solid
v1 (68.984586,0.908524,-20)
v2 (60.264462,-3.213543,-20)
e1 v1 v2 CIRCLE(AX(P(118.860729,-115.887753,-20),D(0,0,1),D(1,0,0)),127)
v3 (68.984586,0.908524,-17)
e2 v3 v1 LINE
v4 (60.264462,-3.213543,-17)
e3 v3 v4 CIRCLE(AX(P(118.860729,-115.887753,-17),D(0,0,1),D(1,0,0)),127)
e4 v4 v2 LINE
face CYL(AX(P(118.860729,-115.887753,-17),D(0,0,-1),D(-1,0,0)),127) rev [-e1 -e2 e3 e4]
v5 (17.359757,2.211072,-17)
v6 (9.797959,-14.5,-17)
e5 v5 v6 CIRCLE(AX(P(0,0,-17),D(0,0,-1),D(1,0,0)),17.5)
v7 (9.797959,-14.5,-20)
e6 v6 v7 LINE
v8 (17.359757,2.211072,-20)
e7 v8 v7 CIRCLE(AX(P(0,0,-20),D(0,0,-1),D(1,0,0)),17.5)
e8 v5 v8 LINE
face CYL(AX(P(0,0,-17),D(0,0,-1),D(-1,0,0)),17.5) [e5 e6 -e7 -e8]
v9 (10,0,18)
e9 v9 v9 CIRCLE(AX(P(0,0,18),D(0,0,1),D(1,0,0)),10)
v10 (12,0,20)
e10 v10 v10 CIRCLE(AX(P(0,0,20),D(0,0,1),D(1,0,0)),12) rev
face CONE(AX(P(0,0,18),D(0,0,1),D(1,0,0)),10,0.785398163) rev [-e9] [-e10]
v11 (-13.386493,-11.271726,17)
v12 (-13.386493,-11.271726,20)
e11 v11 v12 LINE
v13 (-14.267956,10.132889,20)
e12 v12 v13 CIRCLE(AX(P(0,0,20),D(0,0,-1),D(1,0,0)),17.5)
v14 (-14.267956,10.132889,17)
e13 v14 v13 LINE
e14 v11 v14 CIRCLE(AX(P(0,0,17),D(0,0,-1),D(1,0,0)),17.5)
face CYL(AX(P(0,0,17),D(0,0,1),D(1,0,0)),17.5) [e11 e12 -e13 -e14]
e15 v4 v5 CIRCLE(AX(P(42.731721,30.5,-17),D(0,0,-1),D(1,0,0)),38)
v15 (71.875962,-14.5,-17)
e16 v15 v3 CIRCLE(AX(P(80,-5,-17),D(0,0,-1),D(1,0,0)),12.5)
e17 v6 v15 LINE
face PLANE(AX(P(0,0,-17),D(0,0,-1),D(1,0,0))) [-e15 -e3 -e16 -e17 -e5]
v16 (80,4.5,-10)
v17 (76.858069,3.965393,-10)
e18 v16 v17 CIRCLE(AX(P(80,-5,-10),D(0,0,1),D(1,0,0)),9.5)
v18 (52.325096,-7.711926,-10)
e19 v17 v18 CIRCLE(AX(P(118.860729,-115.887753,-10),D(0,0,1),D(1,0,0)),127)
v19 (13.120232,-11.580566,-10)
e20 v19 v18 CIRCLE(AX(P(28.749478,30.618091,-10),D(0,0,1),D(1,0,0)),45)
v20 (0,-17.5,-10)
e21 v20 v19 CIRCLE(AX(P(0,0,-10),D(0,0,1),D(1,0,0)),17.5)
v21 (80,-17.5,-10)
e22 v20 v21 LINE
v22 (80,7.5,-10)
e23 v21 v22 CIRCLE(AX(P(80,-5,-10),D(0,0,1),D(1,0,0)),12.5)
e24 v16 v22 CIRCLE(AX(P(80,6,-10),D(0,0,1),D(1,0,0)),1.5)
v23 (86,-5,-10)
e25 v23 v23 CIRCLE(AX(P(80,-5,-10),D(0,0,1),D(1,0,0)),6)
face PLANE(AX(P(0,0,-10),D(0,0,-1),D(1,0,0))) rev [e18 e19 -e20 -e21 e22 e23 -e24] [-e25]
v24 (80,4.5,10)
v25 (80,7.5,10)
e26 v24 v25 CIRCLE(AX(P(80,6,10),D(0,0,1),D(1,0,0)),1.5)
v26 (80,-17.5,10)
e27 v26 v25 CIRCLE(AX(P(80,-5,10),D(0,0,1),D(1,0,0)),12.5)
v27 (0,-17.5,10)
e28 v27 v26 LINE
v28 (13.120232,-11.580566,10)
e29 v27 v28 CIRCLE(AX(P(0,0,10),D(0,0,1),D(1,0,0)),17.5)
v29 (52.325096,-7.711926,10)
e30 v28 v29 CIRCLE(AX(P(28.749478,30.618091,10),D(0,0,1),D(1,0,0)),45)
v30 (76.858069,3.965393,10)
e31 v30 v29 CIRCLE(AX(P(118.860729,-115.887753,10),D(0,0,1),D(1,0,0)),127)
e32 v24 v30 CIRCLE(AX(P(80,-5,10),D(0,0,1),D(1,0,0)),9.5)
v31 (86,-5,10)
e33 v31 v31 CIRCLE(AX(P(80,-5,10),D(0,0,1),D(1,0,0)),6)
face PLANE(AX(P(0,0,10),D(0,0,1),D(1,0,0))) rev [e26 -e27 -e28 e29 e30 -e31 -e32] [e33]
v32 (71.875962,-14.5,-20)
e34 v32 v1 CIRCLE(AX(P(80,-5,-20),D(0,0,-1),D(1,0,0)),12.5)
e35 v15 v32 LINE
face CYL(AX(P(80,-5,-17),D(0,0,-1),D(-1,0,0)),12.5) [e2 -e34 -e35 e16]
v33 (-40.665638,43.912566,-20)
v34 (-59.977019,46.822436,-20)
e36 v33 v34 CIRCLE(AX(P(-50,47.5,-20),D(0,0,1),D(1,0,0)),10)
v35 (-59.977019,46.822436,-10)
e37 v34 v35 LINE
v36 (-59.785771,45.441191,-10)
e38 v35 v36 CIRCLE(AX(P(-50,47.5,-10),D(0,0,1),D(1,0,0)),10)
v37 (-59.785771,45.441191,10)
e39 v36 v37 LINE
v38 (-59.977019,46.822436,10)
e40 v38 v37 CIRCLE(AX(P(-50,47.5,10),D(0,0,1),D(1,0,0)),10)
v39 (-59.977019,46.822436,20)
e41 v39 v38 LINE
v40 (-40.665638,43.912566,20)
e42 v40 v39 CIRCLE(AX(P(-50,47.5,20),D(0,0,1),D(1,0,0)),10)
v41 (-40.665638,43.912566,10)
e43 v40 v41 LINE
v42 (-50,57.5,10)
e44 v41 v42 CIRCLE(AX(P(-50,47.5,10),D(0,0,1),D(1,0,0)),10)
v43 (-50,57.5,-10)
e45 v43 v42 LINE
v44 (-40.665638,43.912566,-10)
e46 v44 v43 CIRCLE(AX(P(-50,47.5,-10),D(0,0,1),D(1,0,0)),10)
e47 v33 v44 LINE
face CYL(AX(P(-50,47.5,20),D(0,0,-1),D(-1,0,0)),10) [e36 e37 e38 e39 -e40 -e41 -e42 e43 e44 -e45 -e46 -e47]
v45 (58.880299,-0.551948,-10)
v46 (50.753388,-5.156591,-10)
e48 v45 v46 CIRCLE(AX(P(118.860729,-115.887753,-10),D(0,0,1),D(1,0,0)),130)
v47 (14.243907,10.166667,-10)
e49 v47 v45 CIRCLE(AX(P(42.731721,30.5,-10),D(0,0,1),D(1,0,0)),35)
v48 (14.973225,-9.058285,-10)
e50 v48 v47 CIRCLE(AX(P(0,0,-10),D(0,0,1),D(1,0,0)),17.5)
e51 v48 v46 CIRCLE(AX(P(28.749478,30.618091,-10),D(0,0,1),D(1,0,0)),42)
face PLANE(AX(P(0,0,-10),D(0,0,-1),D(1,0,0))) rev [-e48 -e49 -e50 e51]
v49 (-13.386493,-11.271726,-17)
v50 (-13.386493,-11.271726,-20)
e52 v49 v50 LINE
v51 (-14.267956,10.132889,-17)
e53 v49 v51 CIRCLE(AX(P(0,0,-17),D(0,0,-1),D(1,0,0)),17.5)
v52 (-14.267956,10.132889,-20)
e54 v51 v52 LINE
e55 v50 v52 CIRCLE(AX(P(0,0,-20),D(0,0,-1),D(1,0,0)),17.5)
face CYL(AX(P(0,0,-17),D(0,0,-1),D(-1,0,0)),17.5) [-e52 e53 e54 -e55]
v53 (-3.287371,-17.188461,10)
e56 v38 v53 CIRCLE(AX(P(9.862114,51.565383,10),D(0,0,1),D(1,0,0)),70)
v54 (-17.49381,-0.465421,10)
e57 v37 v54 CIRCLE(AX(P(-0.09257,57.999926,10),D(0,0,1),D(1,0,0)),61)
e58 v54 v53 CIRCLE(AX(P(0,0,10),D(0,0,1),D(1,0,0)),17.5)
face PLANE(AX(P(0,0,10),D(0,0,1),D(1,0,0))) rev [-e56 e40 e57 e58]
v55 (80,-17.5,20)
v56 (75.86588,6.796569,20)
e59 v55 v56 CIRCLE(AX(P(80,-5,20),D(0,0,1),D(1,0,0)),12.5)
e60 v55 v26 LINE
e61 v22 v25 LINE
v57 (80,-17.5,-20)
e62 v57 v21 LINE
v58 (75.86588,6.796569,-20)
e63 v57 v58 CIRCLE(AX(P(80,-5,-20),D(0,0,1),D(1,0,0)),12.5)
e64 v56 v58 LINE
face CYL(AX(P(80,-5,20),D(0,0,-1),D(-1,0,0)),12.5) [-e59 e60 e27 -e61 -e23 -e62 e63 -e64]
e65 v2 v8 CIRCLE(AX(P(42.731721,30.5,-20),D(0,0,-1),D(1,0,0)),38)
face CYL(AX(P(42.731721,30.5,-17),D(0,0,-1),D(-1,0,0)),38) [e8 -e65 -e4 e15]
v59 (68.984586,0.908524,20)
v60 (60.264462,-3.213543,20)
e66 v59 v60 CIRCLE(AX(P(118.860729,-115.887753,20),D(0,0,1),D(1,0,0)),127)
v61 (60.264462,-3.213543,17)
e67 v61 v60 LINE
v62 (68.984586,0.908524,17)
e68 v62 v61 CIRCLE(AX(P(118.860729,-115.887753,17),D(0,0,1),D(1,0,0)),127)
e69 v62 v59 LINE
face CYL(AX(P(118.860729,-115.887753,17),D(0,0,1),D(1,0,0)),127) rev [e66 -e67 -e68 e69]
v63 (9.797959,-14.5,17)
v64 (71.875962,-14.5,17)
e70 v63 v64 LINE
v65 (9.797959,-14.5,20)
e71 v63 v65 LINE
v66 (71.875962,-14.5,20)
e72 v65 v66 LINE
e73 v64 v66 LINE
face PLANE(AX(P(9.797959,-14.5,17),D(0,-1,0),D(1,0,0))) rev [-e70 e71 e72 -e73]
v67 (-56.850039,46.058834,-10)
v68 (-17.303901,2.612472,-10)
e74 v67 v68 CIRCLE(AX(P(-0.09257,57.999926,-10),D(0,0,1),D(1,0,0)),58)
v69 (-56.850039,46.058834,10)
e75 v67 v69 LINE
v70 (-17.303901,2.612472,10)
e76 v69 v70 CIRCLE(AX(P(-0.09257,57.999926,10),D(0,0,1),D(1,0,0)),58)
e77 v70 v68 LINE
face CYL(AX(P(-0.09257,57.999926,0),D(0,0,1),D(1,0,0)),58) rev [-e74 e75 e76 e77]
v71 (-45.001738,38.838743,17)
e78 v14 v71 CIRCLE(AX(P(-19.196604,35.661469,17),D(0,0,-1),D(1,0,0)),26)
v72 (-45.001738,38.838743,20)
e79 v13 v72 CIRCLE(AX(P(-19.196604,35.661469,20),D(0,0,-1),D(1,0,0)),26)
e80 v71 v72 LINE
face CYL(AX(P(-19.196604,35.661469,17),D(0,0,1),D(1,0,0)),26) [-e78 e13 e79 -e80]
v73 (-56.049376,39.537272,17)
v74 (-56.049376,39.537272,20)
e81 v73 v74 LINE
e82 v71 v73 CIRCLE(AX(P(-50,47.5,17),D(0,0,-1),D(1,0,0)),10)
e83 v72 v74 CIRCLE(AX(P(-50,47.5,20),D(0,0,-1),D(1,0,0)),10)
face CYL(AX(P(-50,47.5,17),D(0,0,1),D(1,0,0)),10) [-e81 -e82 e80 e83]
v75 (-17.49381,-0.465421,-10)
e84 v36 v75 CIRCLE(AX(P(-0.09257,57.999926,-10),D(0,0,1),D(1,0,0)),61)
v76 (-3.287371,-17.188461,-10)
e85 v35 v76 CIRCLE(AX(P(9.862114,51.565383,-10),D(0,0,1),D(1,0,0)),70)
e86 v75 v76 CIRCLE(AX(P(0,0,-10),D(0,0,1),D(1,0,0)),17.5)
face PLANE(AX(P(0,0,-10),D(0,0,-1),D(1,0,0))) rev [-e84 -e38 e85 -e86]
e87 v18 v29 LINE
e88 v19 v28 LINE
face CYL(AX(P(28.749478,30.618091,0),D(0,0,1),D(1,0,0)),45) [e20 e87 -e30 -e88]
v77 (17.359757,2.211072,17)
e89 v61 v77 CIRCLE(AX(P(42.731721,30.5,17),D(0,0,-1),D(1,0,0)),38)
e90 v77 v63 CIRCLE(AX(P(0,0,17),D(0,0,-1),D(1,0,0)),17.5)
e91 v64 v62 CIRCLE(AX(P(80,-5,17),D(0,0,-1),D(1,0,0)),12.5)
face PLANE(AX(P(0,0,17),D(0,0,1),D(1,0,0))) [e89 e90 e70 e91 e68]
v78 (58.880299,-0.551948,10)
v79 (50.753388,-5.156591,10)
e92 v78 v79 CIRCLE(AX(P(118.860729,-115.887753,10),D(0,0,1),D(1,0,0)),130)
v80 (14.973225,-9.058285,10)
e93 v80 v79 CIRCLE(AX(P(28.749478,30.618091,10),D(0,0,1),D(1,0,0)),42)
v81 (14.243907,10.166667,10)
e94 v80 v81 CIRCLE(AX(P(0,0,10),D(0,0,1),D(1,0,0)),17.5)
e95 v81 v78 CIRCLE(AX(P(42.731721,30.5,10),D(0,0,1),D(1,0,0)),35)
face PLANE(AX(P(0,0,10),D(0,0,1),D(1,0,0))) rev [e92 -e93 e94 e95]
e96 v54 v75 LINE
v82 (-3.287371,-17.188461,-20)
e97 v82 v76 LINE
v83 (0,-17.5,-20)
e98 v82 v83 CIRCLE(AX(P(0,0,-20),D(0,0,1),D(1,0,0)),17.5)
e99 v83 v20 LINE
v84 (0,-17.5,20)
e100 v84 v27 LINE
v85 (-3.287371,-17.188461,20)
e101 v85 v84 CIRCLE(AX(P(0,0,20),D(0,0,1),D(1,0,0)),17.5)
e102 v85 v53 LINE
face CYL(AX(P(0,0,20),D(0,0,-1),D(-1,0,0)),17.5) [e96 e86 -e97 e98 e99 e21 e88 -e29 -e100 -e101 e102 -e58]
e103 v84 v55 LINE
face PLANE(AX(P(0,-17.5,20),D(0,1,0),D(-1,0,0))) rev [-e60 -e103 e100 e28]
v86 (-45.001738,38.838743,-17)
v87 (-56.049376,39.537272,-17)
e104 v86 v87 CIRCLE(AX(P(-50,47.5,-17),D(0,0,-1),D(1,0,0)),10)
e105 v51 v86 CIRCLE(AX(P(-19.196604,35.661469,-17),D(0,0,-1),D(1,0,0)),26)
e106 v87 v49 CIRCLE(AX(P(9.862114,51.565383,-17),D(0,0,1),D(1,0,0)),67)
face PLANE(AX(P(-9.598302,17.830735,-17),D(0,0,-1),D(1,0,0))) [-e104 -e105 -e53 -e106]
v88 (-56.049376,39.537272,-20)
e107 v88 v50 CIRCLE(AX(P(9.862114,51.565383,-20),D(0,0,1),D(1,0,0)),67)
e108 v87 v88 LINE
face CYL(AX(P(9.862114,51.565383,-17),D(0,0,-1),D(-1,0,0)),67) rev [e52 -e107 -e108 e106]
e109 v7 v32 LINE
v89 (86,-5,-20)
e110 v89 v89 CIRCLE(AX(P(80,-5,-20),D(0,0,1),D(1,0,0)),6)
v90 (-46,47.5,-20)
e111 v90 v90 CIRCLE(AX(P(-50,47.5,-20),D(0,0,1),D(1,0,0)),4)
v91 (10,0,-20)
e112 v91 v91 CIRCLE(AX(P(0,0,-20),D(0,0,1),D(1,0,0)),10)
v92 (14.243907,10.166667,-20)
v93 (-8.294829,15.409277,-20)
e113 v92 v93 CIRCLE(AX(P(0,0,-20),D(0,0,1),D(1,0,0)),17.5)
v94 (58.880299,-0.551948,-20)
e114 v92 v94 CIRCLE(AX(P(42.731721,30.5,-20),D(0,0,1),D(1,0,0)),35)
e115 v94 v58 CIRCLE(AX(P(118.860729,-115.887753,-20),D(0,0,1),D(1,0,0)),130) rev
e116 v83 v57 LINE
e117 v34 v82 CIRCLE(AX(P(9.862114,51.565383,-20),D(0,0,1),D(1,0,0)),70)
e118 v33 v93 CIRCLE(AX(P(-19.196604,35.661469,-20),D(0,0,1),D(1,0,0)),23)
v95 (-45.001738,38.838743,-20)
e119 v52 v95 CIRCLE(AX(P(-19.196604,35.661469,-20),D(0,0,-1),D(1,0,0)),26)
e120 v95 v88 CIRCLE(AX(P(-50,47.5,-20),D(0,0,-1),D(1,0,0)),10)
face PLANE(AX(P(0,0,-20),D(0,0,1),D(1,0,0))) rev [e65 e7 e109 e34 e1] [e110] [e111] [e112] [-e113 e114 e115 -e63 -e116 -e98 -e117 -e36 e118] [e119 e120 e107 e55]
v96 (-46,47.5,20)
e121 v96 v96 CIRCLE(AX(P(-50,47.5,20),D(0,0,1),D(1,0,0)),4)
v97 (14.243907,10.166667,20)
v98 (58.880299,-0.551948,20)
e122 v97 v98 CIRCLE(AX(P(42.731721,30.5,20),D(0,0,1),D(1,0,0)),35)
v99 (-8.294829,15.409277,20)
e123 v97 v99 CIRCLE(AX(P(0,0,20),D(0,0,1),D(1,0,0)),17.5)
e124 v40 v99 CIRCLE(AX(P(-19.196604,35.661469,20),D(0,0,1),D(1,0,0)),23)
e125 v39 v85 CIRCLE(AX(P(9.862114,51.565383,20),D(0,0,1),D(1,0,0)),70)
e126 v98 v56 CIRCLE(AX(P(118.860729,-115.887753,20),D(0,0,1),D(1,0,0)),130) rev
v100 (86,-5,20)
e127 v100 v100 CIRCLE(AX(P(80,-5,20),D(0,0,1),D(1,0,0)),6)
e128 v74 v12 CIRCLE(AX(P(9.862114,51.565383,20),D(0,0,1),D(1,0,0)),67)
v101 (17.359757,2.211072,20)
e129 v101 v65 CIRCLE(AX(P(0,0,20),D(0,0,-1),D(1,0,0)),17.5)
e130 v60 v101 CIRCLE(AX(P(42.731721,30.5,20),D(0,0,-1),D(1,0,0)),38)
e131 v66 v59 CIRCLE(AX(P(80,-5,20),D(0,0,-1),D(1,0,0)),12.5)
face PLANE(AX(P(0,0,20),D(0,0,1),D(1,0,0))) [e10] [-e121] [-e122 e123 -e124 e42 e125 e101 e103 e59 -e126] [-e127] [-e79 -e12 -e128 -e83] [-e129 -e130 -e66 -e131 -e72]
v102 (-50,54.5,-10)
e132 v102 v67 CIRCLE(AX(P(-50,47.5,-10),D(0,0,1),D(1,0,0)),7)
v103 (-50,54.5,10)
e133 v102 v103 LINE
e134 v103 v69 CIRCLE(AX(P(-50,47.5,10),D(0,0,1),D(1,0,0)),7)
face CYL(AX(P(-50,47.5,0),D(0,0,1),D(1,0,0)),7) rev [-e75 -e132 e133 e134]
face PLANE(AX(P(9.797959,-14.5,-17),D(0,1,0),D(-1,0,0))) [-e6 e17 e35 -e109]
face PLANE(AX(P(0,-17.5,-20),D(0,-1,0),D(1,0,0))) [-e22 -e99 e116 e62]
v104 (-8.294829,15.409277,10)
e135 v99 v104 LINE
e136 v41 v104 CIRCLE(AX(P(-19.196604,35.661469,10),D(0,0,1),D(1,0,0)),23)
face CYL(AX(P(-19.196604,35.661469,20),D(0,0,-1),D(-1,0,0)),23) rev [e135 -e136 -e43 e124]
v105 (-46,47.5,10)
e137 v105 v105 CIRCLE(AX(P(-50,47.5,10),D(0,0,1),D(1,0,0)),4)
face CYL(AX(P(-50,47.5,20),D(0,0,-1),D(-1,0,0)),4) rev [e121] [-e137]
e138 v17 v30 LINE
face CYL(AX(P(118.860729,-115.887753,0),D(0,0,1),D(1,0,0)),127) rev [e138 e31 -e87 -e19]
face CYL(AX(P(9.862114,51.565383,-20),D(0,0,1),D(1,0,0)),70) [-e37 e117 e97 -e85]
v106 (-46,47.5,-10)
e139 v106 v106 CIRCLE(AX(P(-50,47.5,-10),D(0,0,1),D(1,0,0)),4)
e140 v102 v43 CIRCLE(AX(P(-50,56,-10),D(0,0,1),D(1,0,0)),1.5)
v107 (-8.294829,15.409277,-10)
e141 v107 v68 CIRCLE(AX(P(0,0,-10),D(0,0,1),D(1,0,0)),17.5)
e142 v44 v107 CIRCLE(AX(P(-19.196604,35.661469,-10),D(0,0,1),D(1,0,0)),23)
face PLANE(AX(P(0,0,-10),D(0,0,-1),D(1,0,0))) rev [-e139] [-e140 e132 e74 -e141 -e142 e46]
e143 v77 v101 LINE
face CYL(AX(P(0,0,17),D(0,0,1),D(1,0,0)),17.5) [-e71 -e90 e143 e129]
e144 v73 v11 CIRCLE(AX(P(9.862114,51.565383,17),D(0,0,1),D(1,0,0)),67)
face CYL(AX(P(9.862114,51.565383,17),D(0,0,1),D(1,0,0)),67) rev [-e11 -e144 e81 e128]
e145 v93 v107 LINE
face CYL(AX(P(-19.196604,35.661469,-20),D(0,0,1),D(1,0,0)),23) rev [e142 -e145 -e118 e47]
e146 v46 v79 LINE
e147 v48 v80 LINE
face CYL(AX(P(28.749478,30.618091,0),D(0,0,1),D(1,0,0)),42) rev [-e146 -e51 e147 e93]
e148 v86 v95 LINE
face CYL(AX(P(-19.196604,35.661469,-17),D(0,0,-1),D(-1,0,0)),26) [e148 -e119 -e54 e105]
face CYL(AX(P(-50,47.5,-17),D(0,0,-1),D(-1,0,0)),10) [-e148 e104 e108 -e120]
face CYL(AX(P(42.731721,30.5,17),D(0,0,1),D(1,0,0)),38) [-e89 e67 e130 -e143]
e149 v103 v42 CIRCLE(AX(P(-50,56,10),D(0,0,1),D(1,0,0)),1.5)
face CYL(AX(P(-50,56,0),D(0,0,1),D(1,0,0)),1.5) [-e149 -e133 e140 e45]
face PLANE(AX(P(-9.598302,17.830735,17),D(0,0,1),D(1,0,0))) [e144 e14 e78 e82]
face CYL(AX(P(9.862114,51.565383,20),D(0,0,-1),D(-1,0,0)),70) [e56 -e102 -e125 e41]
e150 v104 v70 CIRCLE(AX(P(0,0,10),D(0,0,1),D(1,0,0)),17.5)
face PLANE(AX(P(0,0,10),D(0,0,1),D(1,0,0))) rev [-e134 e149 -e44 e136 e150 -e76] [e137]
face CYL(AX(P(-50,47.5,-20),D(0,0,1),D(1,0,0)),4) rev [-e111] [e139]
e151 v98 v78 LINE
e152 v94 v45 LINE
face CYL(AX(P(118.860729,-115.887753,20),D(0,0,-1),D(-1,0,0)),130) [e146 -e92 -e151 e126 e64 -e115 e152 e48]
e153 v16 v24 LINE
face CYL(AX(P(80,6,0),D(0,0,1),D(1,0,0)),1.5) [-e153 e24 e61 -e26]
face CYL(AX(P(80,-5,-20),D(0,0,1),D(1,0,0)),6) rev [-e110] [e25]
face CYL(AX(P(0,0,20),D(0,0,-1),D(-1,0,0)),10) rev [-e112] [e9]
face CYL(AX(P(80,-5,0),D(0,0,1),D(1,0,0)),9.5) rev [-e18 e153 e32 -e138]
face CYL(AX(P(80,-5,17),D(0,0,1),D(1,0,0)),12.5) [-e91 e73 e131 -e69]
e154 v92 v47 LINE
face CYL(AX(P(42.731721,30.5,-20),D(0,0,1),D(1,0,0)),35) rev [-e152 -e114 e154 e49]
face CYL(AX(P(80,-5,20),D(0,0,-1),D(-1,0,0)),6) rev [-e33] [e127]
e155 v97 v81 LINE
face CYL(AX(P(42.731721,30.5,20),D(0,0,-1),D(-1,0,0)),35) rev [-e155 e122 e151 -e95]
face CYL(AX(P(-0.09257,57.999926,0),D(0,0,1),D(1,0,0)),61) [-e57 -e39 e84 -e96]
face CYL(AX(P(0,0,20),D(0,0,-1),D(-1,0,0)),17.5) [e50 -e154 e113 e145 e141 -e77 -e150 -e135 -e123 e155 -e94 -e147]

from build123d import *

# Parameters (mm, degrees)
SKETCH_1_R          = 17.5
SKETCH_1_R_2        = 10
EXTRUDE_1_DEPTH     = 20
EXTRUDE_START       = 20
EXTRUDE_3_DEPTH     = 10
SKETCH_1_5_R        = 10
SKETCH_1_5_R_2      = 4
SKETCH_1_5_R_3      = 12.5
SKETCH_1_5_R_4      = 6
EXTRUDE_6_DEPTH     = 10
EXTRUDE_START_2     = -20
EXTRUDE_5_DEPTH     = 10
CUT_EXTRUDE_2_DEPTH = 3
CHAMFER_2_SIZE      = 2


# Read off the part's stored shape, not the designer's step: 凸台-拉伸5
with BuildPart() as part:
    # 草图1 → 凸台-拉伸1 (new, symmetric)
    with BuildSketch(Plane.XY):
        Circle(SKETCH_1_R)
        Circle(SKETCH_1_R_2, mode=Mode.SUBTRACT)
    extrude(amount=EXTRUDE_1_DEPTH, both=True)

    # 草图1<4> → 凸台-拉伸3 (add)
    with BuildSketch(Plane.XY.offset(EXTRUDE_START)):
        with BuildLine():
            ThreePointArc((17.5, 0), (12.374368671, -12.374368671), (0, -17.5))
            Line((0, -17.5), (80, -17.5))
            ThreePointArc((80, -17.5), (67.677112384, -7.096769134), (75.865879936, 6.796569471))
            ThreePointArc((75.865879936, 6.796569471), (67.242154598, 3.424957178), (58.880298558, -0.551947613))
            ThreePointArc((58.880298558, -0.551947613), (34.559428753, -3.532537894), (14.243907079, 10.166666667))
            ThreePointArc((14.243907079, 10.166666667), (16.666108932, 5.33767862), (17.5, 0))
        make_face()
        with BuildLine():
            ThreePointArc((-59.977018957, 46.822436185), (-42.541382371, 5.155539161), (-3.287371248, -17.188460963))
            ThreePointArc((-3.287371248, -17.188460963), (-17.297108649, -2.657072143), (-8.294829009, 15.409276807))
            ThreePointArc((-8.294829009, 15.409276807), (-34.396147549, 18.399549118), (-40.66563766, 43.912566419))
            ThreePointArc((-40.66563766, 43.912566419), (-51.48999577, 37.611627404), (-59.977018957, 46.822436185))
        make_face()
    extrude_3 = extrude(amount=-EXTRUDE_3_DEPTH)

    # 草图1<5> → 凸台-拉伸6 (add)
    # profile 1 of 2: a face of its own
    with BuildSketch(Plane.XY.offset(EXTRUDE_START)):
        with Locations((-50, 47.5)):
            Circle(SKETCH_1_5_R)
        with Locations((-50, 47.5)):
            Circle(SKETCH_1_5_R_2, mode=Mode.SUBTRACT)
    # profile 2 of 2: a face of its own
    with BuildSketch(Plane.XY.offset(EXTRUDE_START)):
        with Locations((80, -5)):
            Circle(SKETCH_1_5_R_3)
        with Locations((80, -5)):
            Circle(SKETCH_1_5_R_4, mode=Mode.SUBTRACT)
    extrude_6 = extrude(amount=-EXTRUDE_6_DEPTH)

    # 凸台-拉伸5 outline → 凸台-拉伸5 (add)
    with BuildSketch(Plane.XY.offset(20).offset(EXTRUDE_START_2)):
        with BuildLine():
            ThreePointArc((75.865879936, 6.796569471), (62.989057462, 1.493490631), (50.753387878, -5.156591476))
            ThreePointArc((50.753387878, -5.156591476), (33.302431775, -11.134400774), (14.973225116, -9.058285137))
            ThreePointArc((14.973225116, -9.058285137), (14.103228764, -10.36093328), (13.120232239, -11.580565876))
            ThreePointArc((13.120232239, -11.580565876), (33.168505088, -14.164407302), (52.325095741, -7.711925974))
            ThreePointArc((52.325095741, -7.711925974), (64.278403719, -1.215307299), (76.858068751, 3.965392798))
            ThreePointArc((76.858068751, 3.965392798), (78.406455458, 4.365394588), (80, 4.5))
            ThreePointArc((80, 4.5), (81.5, 6), (80, 7.5))
            ThreePointArc((80, 7.5), (77.903230866, 7.322887616), (75.865879936, 6.796569471))
        make_face()
        with BuildLine():
            ThreePointArc((-59.785770553, 45.441190955), (-44.956168286, 16.668853496), (-17.493809847, -0.465421371))
            ThreePointArc((-17.493809847, -0.465421371), (-17.466783539, 1.077716469), (-17.303901028, 2.612471858))
            ThreePointArc((-17.303901028, 2.612471858), (-42.984788985, 18.9581848), (-56.850039387, 46.058833669))
            ThreePointArc((-56.850039387, 46.058833669), (-55.435446822, 51.910886287), (-50, 54.5))
            ThreePointArc((-50, 54.5), (-48.5, 56), (-50, 57.5))
            ThreePointArc((-50, 57.5), (-57.764924032, 53.801266125), (-59.785770553, 45.441190955))
        make_face()
    extrude_5 = extrude(amount=EXTRUDE_5_DEPTH)

    # 草图4 → 切除-拉伸2 (cut)
    with BuildSketch(Plane.XY.offset(20)):
        with BuildLine():
            Line((9.797958971, -14.5), (71.875961595, -14.5))
            ThreePointArc((71.875961595, -14.5), (67.71442663, -7.305360487), (68.984586296, 0.908524428))
            ThreePointArc((68.984586296, 0.908524428), (64.585377696, -1.069695724), (60.264462328, -3.213543123))
            ThreePointArc((60.264462328, -3.213543123), (37.965174398, -7.199867788), (17.359756877, 2.211072406))
            ThreePointArc((17.359756877, 2.211072406), (15.943662307, -7.214543107), (9.797958971, -14.5))
        make_face()
        with BuildLine():
            ThreePointArc((-14.267956002, 10.132888607), (-17.485179944, -0.720057157), (-13.386492598, -11.271726395))
            ThreePointArc((-13.386492598, -11.271726395), (-41.448404378, 8.481386673), (-56.049376429, 39.537271522))
            ThreePointArc((-56.049376429, 39.537271522), (-50.631027802, 37.519929664), (-45.001738128, 38.838742686))
            ThreePointArc((-45.001738128, 38.838742686), (-36.943813272, 16.660506762), (-14.267956002, 10.132888607))
        make_face()
    cut_extrude_2 = extrude(amount=-CUT_EXTRUDE_2_DEPTH, mode=Mode.SUBTRACT)

    # 倒角2
    chamfer_2_edges = [part.edges().sort_by_distance(p)[0] for p in [
        (-10, 0, 20),
    ]]
    chamfer(chamfer_2_edges, length=CHAMFER_2_SIZE)

    # 镜向6: 凸台-拉伸3, 凸台-拉伸6, 凸台-拉伸5, 切除-拉伸2 across plane
    add(extrude_3.mirror(Plane.XY))
    add(extrude_6.mirror(Plane.XY))
    add(extrude_5.mirror(Plane.XY))
    add(cut_extrude_2.mirror(Plane.XY), mode=Mode.SUBTRACT)


solid = part.part
